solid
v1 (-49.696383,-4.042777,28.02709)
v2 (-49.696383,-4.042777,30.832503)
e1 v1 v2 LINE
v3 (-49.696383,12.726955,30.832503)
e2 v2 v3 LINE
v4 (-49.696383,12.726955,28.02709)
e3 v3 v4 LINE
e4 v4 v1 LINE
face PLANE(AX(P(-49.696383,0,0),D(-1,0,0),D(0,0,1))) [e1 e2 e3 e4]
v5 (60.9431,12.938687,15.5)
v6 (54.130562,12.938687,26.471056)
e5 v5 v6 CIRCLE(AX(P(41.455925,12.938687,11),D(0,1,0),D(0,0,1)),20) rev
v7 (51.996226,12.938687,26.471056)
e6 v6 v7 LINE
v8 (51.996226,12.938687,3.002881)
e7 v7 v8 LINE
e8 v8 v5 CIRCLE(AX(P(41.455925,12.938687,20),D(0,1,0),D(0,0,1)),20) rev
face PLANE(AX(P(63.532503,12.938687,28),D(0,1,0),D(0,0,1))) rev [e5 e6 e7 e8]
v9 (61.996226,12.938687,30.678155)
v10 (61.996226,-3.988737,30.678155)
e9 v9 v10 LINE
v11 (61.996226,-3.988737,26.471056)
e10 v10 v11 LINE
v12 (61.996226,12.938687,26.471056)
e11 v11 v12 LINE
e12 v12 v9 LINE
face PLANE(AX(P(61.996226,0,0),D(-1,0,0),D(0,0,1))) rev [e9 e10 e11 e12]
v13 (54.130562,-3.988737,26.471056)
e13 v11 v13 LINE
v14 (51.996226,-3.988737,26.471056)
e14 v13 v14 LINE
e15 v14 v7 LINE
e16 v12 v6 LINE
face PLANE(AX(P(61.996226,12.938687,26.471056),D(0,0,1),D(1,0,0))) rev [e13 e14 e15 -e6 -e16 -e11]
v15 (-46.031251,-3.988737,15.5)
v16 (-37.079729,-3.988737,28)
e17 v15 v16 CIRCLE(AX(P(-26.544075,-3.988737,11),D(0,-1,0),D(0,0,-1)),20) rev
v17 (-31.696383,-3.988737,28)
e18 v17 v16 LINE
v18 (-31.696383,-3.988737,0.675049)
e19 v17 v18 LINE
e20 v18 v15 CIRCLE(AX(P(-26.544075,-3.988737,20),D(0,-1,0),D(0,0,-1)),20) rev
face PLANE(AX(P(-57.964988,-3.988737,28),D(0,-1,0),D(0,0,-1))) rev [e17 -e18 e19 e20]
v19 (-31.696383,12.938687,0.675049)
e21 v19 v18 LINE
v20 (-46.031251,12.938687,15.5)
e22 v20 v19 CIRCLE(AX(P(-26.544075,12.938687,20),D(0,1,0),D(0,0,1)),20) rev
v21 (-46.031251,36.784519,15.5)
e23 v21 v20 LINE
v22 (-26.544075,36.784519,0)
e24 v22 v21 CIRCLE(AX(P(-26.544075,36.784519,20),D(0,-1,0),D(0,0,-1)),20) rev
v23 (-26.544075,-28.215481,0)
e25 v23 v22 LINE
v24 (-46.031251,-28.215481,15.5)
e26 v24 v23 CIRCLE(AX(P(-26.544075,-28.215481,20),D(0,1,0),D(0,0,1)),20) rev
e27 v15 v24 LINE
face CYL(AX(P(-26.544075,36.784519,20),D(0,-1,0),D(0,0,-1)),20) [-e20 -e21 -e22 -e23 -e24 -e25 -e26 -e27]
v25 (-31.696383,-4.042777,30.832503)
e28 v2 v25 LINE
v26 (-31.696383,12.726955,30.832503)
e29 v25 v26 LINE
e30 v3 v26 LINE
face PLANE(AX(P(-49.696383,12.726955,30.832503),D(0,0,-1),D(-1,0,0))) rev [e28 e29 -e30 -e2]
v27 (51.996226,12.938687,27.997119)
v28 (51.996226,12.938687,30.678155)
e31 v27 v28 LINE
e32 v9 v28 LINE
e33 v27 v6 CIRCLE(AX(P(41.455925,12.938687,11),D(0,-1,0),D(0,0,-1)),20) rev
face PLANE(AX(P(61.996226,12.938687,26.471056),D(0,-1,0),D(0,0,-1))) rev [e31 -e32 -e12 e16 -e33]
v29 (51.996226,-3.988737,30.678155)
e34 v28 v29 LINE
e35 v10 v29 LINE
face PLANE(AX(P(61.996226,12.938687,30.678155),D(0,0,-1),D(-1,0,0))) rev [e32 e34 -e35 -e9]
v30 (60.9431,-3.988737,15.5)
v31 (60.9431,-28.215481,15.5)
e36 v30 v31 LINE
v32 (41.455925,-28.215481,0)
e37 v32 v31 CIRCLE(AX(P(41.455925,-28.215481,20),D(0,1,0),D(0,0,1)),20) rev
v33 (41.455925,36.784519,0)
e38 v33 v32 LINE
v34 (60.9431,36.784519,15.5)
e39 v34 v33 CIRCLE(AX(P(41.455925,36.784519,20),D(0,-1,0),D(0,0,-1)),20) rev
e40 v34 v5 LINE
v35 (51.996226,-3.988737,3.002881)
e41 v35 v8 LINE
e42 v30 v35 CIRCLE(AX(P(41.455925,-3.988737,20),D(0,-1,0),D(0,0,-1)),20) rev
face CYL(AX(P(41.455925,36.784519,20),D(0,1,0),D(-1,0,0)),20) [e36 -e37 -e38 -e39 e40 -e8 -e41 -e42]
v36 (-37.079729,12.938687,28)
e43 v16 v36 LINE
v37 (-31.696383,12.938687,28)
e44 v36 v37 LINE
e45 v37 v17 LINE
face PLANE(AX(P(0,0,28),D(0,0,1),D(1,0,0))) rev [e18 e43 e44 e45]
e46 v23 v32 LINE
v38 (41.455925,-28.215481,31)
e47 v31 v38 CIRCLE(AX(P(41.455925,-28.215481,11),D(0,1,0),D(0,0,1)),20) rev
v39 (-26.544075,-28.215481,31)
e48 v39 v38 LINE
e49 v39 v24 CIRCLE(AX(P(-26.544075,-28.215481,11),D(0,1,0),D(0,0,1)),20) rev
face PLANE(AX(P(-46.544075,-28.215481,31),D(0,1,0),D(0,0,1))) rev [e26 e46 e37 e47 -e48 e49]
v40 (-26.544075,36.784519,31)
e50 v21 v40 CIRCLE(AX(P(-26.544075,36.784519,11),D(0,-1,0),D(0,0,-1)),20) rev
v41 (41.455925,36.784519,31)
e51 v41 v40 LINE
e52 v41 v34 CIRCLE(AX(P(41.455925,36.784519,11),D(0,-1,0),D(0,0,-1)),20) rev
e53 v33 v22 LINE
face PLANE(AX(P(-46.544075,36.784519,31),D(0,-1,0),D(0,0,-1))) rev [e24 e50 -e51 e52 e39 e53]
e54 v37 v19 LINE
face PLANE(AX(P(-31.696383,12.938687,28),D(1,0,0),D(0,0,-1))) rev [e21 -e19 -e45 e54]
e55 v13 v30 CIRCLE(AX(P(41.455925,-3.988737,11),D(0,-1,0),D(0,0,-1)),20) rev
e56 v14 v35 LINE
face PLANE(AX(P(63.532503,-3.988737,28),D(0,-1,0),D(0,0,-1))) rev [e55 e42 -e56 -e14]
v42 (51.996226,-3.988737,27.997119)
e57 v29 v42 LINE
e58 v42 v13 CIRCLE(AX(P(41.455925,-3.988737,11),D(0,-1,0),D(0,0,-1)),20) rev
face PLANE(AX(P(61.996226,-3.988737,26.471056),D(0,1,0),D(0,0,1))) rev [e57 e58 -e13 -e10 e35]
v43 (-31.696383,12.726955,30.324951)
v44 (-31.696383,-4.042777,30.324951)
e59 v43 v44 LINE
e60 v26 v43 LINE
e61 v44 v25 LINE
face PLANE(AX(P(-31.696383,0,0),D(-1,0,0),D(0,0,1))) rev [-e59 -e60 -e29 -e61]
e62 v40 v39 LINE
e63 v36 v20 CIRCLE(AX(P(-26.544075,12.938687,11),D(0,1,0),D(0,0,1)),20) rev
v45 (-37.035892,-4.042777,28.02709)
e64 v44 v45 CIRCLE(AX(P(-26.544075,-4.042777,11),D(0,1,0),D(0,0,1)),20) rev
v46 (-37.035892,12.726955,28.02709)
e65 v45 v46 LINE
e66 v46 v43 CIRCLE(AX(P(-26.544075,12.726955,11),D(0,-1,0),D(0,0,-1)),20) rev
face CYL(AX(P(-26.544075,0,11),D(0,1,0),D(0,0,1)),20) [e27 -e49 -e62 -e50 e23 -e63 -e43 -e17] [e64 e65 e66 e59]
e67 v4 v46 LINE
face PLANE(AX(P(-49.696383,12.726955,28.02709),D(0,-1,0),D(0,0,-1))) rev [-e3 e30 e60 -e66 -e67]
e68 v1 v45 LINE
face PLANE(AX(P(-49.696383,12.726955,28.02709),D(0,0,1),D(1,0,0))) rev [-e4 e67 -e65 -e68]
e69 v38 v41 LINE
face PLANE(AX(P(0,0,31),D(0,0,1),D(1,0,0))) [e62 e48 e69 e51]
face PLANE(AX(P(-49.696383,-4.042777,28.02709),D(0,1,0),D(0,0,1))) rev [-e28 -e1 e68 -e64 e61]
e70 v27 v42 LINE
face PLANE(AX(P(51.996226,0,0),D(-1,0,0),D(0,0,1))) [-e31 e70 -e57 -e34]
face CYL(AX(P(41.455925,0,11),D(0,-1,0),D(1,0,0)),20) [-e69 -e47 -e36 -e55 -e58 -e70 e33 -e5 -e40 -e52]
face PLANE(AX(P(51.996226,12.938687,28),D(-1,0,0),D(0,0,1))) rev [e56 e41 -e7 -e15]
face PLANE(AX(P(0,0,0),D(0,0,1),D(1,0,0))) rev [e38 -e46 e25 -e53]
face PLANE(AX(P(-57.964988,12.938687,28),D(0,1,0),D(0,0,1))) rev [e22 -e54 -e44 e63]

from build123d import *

# Parameters (mm, degrees)
SKETCH1_W           = 108
SKETCH1_H           = 65
BOSS_EXTRUDE1_DEPTH = 31
FILLET1_R           = 20
SKETCH2_W           = 11.536276889
SKETCH2_H           = 16.92742392
SKETCH2_W_2         = 26.268605015
CUT_EXTRUDE1_DEPTH  = 28
SKETCH3_W           = 2.805413746
SKETCH3_H           = 16.76973244
BOSS_EXTRUDE2_DEPTH = 18
SKETCH4_W           = 4.207099317
SKETCH4_H           = 16.92742392
BOSS_EXTRUDE3_DEPTH = 10


with BuildPart() as part:
    # Sketch1 → Boss-Extrude1 (new body)
    with BuildSketch(Plane.XY):
        with Locations((7.455924682, 4.284519209)):
            Rectangle(SKETCH1_W, SKETCH1_H)
    extrude(amount=BOSS_EXTRUDE1_DEPTH)

    # Fillet1
    # the kernel refuses this fillet: 20 mm, written as the material it takes off along each edge
    with BuildSketch(Plane(origin=(61.455924682, 86.784519209, 0), x_dir=(0, 0, 1), z_dir=(0, -1, 0)), Plane(origin=(-46.544075318, -78.215480791, 0), x_dir=(0, 0, 1), z_dir=(0, 1, 0))) as fillet1_piece_1:
        with BuildLine():
            CenterArc((FILLET1_R, FILLET1_R), FILLET1_R, 180, 90)
            Line((0, FILLET1_R), (0, 0))
            Line((0, 0), (FILLET1_R, 0))
        make_face()
    extrude(amount=165, mode=Mode.SUBTRACT)
    with BuildSketch(Plane(origin=(61.455924682, 86.784519209, 31), x_dir=(0, 0, -1), z_dir=(0, -1, 0)), Plane(origin=(-46.544075318, -78.215480791, 31), x_dir=(0, 0, -1), z_dir=(0, 1, 0))) as fillet1_piece_2:
        with BuildLine():
            CenterArc((FILLET1_R, -FILLET1_R), FILLET1_R, 90, 90)
            Line((0, -FILLET1_R), (0, 0))
            Line((0, 0), (FILLET1_R, 0))
        make_face()
    extrude(amount=165, mode=Mode.SUBTRACT)

    # Sketch2 → Cut-Extrude1 (cut)
    with BuildSketch(Plane(origin=(0, 0, 0), x_dir=(-1, 0, 0), z_dir=(0, 0, -1))):
        with Locations((-57.764364891, 4.474974683)):
            Rectangle(SKETCH2_W, SKETCH2_H)
        with Locations((44.830685277, 4.474974683)):
            Rectangle(SKETCH2_W_2, SKETCH2_H)
    extrude(amount=-CUT_EXTRUDE1_DEPTH, mode=Mode.SUBTRACT)

    # Sketch3 → Boss-Extrude2 (add)
    with BuildSketch(Plane.ZY.offset(31.696382769)):
        with Locations((29.429796439, 4.342088928)):
            Rectangle(SKETCH3_W, SKETCH3_H)
    extrude(amount=BOSS_EXTRUDE2_DEPTH)

    # Sketch4 → Boss-Extrude3 (add)
    with BuildSketch(Plane(origin=(51.996226446, 0, 0), x_dir=(0, 0, -1), z_dir=(1, 0, 0))):
        with Locations((-28.574605447, 4.474974683)):
            Rectangle(SKETCH4_W, SKETCH4_H)
    extrude(amount=BOSS_EXTRUDE3_DEPTH)


solid = part.part
